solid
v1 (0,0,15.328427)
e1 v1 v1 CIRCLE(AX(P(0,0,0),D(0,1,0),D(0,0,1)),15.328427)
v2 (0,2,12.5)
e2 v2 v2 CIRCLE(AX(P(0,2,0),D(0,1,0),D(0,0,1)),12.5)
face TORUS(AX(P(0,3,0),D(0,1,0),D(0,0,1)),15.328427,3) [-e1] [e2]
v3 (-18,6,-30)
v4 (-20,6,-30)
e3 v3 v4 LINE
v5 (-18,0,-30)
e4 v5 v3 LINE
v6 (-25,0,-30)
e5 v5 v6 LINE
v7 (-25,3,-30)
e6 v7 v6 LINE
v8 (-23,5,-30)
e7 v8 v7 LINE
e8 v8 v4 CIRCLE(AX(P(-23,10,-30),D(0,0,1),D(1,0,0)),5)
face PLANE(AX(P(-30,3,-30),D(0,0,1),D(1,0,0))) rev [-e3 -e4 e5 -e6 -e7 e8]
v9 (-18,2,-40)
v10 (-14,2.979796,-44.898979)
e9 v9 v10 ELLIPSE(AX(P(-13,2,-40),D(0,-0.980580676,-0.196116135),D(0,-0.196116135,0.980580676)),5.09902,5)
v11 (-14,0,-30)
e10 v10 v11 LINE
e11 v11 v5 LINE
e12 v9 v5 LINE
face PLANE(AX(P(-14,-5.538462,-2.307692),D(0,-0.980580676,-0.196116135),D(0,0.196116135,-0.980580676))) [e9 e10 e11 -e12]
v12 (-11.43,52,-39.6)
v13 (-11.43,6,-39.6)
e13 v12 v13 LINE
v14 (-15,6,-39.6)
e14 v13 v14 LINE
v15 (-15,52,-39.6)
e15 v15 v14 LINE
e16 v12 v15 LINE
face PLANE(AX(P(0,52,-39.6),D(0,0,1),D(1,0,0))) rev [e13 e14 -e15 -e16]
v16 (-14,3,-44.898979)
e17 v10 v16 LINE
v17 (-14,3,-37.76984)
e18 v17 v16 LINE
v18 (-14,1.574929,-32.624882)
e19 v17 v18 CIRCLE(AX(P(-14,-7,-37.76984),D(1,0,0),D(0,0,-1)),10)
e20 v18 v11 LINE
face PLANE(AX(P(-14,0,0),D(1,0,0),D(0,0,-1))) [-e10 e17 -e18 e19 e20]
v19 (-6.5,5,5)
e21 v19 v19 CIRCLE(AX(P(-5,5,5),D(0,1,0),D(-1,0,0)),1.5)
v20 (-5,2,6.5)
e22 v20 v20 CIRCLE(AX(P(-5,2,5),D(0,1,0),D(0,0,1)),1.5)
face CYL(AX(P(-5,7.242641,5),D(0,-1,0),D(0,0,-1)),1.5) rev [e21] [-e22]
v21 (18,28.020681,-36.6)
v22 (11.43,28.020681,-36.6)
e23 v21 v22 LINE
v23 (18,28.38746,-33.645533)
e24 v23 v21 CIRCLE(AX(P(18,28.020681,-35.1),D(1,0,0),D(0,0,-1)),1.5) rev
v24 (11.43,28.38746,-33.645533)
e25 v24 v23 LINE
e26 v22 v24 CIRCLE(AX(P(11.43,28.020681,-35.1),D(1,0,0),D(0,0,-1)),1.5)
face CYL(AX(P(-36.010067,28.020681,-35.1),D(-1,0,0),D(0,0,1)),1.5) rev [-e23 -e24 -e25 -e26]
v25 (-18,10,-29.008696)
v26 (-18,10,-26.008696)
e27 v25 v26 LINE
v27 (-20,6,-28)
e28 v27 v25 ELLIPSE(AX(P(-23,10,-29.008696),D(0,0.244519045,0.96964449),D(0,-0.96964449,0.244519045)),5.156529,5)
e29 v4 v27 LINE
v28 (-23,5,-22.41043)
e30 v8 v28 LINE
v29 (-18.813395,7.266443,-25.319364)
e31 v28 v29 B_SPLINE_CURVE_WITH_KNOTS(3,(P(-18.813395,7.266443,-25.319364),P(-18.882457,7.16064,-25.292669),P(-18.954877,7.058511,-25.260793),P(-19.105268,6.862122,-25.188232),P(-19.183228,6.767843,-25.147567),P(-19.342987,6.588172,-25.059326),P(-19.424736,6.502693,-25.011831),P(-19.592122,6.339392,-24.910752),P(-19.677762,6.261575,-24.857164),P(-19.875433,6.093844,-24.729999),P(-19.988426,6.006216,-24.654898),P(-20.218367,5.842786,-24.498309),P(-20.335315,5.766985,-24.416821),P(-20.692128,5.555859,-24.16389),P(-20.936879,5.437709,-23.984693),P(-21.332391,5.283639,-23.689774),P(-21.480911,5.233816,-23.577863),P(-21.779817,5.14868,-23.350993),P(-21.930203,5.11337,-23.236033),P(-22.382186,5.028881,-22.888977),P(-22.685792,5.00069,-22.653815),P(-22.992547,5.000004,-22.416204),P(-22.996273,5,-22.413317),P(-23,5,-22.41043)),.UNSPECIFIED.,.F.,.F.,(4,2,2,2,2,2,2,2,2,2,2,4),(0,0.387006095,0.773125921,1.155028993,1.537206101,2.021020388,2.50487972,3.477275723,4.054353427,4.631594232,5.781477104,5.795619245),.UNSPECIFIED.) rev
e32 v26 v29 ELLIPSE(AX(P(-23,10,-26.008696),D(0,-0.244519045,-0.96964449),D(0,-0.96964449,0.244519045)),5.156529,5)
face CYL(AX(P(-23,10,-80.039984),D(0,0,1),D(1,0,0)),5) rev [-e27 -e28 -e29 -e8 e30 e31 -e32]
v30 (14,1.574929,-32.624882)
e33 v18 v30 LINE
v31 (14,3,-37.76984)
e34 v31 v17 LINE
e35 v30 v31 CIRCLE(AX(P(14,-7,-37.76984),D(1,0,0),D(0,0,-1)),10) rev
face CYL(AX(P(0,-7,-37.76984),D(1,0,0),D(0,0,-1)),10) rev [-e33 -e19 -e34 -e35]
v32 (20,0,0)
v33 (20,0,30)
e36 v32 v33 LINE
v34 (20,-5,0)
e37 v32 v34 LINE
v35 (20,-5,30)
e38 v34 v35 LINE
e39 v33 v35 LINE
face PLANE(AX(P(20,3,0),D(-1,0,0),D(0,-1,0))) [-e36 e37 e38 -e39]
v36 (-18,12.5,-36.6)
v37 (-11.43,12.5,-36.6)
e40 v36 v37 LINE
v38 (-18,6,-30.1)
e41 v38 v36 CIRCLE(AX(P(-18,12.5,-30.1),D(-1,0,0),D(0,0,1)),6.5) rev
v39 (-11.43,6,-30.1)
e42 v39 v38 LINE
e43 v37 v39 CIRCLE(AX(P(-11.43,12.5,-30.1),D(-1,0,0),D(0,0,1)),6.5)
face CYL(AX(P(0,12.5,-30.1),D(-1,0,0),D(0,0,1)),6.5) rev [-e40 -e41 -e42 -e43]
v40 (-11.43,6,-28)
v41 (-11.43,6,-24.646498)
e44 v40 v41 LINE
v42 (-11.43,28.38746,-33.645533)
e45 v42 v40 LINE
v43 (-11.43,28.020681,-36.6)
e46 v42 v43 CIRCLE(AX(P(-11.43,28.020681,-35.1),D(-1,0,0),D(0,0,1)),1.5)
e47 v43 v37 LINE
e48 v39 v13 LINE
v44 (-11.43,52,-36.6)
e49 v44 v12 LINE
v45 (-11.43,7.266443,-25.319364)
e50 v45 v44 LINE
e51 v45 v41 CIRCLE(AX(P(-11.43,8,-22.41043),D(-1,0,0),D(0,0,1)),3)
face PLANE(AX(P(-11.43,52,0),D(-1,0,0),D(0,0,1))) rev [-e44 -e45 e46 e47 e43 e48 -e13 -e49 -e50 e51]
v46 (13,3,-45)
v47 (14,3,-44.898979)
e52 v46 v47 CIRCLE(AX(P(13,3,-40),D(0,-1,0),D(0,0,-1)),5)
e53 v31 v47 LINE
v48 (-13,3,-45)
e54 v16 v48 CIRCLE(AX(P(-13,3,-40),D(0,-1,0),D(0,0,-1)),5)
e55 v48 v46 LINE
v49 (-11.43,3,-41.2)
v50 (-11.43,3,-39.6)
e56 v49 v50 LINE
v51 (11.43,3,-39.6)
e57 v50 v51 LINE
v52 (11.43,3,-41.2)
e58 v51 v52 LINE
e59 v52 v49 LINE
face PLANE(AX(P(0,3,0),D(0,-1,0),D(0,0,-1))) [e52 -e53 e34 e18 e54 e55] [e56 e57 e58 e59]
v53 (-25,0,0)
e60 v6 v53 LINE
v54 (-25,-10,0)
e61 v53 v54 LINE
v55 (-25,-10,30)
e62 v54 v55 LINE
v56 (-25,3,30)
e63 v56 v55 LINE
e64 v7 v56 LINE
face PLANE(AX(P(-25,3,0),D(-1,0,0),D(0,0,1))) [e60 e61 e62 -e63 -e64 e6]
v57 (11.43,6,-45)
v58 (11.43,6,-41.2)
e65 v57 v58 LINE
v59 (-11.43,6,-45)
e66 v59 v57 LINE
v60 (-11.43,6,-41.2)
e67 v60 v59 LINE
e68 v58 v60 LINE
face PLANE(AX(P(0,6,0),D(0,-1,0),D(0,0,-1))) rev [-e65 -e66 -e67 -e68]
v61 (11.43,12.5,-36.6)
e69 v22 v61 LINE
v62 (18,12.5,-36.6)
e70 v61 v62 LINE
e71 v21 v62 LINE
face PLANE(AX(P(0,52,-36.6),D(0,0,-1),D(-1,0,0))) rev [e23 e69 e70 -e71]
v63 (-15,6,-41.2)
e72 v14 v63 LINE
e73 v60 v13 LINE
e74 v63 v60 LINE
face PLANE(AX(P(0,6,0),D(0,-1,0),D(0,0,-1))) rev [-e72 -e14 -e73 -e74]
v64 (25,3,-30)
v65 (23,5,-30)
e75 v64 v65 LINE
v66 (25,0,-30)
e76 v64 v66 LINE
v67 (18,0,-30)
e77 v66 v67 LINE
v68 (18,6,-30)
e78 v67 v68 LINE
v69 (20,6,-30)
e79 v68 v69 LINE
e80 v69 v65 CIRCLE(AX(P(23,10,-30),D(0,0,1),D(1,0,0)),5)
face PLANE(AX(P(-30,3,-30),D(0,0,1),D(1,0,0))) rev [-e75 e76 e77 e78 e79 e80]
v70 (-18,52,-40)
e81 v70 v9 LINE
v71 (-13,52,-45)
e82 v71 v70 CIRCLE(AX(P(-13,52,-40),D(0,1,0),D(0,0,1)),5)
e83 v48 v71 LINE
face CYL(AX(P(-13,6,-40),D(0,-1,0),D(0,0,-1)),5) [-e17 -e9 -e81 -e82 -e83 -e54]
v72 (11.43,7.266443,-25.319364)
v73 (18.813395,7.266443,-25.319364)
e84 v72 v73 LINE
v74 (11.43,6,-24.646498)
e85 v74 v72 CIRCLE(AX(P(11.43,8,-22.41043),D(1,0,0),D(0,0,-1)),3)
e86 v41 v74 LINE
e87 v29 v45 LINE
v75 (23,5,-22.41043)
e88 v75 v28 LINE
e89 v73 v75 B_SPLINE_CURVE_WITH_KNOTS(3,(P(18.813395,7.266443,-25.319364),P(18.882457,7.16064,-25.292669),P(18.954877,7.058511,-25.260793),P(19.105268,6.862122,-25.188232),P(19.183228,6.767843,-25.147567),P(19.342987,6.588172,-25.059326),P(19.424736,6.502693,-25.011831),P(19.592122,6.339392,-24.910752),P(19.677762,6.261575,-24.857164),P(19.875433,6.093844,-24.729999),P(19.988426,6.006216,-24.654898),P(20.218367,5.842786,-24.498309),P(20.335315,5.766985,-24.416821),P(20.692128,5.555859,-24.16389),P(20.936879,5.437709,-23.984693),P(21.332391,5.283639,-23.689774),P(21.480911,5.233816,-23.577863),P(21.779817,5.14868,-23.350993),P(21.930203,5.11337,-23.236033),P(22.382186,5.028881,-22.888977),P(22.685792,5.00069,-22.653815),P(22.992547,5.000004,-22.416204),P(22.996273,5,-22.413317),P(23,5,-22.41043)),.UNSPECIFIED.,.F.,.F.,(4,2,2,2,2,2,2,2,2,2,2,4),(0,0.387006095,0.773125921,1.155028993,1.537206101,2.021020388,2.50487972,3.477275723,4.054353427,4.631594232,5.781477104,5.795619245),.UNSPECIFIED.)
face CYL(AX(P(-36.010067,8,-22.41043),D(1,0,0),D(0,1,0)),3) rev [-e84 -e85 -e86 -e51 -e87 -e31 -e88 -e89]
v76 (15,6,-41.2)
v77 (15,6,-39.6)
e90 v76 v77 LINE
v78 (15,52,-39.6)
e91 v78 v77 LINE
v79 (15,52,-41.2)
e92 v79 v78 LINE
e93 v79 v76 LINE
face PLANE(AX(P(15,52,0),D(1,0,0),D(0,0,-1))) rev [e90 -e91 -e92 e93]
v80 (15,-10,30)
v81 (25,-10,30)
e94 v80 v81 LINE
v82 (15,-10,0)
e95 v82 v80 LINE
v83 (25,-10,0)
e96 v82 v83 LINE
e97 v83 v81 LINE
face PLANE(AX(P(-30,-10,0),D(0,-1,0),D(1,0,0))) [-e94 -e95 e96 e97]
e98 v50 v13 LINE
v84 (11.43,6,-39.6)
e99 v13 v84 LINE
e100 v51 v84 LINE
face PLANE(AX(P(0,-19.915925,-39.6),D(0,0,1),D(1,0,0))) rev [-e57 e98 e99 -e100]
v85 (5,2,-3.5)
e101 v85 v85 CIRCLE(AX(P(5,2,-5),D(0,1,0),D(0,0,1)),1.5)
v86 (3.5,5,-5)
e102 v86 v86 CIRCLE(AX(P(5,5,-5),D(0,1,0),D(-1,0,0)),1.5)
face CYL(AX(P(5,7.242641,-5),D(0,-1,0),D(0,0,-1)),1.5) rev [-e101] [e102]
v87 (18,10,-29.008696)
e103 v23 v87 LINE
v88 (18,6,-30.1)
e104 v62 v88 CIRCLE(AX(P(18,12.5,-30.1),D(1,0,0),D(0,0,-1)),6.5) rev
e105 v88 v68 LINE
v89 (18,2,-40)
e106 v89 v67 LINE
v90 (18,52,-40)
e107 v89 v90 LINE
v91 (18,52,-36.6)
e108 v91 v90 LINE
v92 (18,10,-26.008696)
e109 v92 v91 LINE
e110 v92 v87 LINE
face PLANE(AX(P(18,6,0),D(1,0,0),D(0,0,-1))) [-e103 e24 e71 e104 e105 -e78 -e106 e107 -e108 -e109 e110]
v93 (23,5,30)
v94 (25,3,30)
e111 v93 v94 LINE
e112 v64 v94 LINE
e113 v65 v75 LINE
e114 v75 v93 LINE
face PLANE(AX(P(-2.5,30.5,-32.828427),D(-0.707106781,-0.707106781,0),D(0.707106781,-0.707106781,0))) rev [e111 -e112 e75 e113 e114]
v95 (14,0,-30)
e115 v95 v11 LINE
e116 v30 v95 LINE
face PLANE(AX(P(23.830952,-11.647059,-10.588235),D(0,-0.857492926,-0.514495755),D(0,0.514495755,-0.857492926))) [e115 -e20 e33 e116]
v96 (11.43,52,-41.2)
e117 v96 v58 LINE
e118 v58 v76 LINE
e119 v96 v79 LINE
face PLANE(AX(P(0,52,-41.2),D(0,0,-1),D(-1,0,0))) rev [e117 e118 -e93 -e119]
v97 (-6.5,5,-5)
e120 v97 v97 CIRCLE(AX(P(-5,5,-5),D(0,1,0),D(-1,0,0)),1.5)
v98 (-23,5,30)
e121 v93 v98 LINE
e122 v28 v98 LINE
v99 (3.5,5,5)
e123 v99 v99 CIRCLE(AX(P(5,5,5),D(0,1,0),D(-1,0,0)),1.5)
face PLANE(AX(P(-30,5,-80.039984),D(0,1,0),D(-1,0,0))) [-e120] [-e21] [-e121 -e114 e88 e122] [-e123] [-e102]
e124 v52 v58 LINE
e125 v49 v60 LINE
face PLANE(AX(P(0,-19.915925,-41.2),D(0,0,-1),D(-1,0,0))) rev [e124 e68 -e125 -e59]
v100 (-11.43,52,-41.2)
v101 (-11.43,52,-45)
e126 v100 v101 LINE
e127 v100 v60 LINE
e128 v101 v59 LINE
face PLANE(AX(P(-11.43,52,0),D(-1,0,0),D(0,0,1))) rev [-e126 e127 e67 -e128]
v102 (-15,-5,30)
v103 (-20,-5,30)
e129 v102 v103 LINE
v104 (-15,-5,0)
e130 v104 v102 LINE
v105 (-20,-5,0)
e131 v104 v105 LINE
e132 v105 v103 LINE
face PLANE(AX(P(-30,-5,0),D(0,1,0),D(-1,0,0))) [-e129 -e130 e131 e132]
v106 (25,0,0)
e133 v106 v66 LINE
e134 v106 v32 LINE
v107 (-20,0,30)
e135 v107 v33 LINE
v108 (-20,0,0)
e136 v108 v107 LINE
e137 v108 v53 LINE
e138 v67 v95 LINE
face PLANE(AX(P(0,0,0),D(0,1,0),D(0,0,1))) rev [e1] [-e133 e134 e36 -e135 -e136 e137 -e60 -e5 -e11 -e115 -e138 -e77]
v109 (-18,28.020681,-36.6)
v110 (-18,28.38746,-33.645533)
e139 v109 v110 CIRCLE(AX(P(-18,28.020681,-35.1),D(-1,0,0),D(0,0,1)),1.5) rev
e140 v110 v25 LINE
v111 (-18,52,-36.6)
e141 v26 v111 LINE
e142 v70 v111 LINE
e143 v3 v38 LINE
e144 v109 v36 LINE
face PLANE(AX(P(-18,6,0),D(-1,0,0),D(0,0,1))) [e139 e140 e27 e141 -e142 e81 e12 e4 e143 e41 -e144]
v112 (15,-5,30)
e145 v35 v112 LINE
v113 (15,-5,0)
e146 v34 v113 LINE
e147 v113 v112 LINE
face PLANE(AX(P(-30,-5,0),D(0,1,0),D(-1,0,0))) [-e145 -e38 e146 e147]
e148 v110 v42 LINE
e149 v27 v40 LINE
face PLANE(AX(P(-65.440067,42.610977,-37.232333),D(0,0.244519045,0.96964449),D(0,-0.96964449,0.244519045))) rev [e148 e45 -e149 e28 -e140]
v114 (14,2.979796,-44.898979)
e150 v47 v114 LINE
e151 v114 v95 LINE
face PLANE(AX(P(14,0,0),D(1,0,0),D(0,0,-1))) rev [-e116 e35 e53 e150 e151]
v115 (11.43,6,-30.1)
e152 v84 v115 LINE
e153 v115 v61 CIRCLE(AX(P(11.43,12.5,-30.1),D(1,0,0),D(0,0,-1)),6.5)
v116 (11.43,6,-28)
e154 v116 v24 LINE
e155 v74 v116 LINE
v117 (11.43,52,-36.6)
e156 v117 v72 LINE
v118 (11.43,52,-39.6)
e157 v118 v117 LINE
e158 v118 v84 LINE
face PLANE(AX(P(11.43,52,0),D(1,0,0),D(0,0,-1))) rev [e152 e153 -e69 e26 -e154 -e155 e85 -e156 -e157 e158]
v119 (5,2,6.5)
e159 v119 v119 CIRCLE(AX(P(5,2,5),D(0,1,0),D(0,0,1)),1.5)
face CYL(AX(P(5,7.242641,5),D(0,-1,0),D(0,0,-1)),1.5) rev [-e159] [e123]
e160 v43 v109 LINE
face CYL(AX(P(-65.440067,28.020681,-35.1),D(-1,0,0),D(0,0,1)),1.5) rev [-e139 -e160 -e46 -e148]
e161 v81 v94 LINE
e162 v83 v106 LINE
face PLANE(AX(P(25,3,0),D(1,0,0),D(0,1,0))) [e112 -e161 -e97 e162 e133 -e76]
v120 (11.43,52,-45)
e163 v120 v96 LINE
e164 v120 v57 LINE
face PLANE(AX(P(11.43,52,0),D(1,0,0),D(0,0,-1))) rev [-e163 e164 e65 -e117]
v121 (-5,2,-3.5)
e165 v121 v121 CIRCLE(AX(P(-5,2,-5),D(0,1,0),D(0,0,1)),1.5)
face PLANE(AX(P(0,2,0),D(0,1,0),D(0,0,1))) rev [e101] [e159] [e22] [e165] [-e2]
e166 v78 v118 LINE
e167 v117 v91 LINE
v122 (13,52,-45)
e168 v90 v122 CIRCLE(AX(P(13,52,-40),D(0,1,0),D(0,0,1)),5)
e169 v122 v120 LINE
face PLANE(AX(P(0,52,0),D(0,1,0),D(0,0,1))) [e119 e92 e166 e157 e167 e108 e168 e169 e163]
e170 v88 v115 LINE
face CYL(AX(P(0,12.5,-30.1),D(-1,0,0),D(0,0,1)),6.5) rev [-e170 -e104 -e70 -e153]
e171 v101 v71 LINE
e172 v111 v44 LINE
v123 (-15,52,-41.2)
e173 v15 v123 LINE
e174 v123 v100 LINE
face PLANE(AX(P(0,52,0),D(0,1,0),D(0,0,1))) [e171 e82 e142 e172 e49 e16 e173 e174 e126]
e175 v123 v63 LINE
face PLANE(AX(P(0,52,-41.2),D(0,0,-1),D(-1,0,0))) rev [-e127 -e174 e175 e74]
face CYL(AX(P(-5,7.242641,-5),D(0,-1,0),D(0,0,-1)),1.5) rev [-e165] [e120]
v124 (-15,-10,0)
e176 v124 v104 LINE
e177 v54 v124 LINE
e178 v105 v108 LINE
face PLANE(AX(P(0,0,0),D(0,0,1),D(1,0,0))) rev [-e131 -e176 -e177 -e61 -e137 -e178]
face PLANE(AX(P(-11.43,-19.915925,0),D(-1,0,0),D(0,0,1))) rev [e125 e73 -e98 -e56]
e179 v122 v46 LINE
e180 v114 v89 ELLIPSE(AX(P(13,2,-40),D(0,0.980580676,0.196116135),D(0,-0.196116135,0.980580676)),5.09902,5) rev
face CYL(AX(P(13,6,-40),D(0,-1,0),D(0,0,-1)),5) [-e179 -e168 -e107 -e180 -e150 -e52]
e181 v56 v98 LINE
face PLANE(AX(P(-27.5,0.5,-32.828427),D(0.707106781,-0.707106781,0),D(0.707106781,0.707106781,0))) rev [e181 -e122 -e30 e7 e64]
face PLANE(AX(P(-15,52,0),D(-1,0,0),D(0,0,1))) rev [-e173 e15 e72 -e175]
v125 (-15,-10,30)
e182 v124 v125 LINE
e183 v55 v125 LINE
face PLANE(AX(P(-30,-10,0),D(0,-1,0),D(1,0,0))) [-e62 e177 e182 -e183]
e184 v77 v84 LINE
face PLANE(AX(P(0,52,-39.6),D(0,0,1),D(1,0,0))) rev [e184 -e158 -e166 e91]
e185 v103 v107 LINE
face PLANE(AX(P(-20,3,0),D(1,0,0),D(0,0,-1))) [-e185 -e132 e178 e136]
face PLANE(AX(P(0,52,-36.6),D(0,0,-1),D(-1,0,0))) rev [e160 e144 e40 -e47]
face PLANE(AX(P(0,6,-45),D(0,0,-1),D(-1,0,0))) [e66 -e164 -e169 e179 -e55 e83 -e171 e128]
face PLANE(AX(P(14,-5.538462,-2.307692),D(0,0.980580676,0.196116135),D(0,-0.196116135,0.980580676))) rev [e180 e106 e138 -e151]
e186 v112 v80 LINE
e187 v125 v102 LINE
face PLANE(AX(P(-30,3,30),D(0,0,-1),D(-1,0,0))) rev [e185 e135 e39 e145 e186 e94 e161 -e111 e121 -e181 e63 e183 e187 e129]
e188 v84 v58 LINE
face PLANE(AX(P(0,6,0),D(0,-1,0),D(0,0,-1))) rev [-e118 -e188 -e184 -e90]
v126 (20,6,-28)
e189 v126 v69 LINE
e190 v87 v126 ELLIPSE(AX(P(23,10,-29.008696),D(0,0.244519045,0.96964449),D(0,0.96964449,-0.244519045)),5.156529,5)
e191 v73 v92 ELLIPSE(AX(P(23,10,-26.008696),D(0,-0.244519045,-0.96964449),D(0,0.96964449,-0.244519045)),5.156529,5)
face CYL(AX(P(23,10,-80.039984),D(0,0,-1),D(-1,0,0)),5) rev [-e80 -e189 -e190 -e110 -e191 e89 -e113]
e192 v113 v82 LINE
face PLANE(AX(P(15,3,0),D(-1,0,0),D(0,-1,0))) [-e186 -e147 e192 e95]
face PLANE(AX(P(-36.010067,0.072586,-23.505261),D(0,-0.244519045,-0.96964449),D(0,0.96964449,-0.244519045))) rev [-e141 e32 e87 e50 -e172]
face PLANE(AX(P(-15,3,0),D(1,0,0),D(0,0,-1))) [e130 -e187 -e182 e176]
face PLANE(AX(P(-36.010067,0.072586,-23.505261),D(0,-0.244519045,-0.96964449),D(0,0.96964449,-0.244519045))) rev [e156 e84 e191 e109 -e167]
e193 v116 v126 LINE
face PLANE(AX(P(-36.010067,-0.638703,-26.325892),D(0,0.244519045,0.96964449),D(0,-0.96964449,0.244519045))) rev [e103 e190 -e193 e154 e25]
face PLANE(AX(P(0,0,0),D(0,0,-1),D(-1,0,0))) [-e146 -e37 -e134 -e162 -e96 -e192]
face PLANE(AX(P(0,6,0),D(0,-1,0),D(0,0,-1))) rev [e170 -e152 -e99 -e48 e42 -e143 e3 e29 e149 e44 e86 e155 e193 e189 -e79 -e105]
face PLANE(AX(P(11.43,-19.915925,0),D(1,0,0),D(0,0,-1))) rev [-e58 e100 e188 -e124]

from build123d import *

# Parameters (mm, degrees)
SKETCH_2_W          = 60
SKETCH_2_H          = 60
EXTRUDE_1_DEPTH     = 3
SKETCH_3_R          = 1.5
CUT_EXTRUDE_1_DEPTH = 3
EXTRUDE_START       = 30
EXTRUDE_3_DEPTH     = 30
EXTRUDE_START_2     = 3
SKETCH_8_W          = 36
SKETCH_8_H          = 20
EXTRUDE_4_DEPTH     = 3
CUT_EXTRUDE_START   = 6
SKETCH_10_W         = 22.86
SKETCH_10_H         = 1.6
CUT_EXTRUDE_2_DEPTH = 3
EXTRUDE_START_3     = 6
EXTRUDE_5_DEPTH     = 46
EXTRUDE_START_4     = -18
EXTRUDE_6_DEPTH     = 36
EXTRUDE_START_5     = 18
EXTRUDE_8_DEPTH     = 6.57
EXTRUDE_START_6     = -11.43
EXTRUDE_9_DEPTH     = 6.57
EXTRUDE_10_DEPTH    = 36
SKETCH_16_W         = 5
SKETCH_16_H         = 60
CUT_EXTRUDE_3_DEPTH = 3
EXTRUDE_11_DEPTH    = 4
EXTRUDE_12_DEPTH    = 4
FILLET_3_R          = 5
FILLET_4_R          = 10
SKETCH_22_W         = 50
SKETCH_22_H         = 2
EXTRUDE_14_DEPTH    = 60
CUT_EXTRUDE_START_2 = 30
CUT_EXTRUDE_4_DEPTH = 60
SKETCH_25_R         = 1.5
CUT_EXTRUDE_5_DEPTH = 5
SKETCH_26_R         = 12.5
CUT_EXTRUDE_6_DEPTH = 2
FILLET_5_R          = 3
FILLET_7_R          = 5
FILLET_8_R          = 6.5
FILLET_9_R          = 1.5
FILLET_10_R         = 3


with BuildPart() as part:
    # 草图2 → 凸台-拉伸1 (new body)
    with BuildSketch(Plane(origin=(0, 0, 0), x_dir=(1, 0, 0), z_dir=(0, 1, 0))):
        Rectangle(SKETCH_2_W, SKETCH_2_H)
    extrude(amount=EXTRUDE_1_DEPTH)

    # 草图3 → 切除-拉伸1 (cut)
    with BuildSketch(Plane(origin=(0, 0, 0), x_dir=(1, 0, 0), z_dir=(0, 1, 0))):
        with Locations(Location((-5, -5, 0), (0, 0, 270))):
            Circle(SKETCH_3_R)
        with Locations(Location((5, -5, 0), (0, 0, 270))):
            Circle(SKETCH_3_R)
        with Locations(Location((5, 5, 0), (0, 0, 270))):
            Circle(SKETCH_3_R)
        with Locations(Location((-5, 5, 0), (0, 0, 270))):
            Circle(SKETCH_3_R)
    extrude(amount=CUT_EXTRUDE_1_DEPTH, mode=Mode.SUBTRACT)

    # 草图7 → 凸台-拉伸3 (add)
    with BuildSketch(Plane.XY.offset(EXTRUDE_START)):
        Polygon((-25, 0), (-25, -10), (-15, -10), (-15, -5), (-20, -5), (-20, 0), align=None)
        Polygon((20, 0), (25, 0), (25, -10), (15, -10), (15, -5), (20, -5), align=None)
    extrude(amount=-EXTRUDE_3_DEPTH)

    # 草图8 → 凸台-拉伸4 (add)
    with BuildSketch(Plane(origin=(0, 0, 0), x_dir=(1, 0, 0), z_dir=(0, 1, 0)).offset(EXTRUDE_START_2)):
        with Locations((0, 35)):
            Rectangle(SKETCH_8_W, SKETCH_8_H)
    extrude(amount=EXTRUDE_4_DEPTH)

    # 草图10 → 切除-拉伸2 (cut)
    with BuildSketch(Plane(origin=(0, 0, 0), x_dir=(1, 0, 0), z_dir=(0, 1, 0)).offset(CUT_EXTRUDE_START)):
        with Locations((0, 40.4)):
            Rectangle(SKETCH_10_W, SKETCH_10_H)
    extrude(amount=-CUT_EXTRUDE_2_DEPTH, mode=Mode.SUBTRACT)

    # 草图11 → 凸台-拉伸5 (add)
    with BuildSketch(Plane(origin=(0, 0, 0), x_dir=(1, 0, 0), z_dir=(0, 1, 0)).offset(EXTRUDE_START_3)):
        Polygon((11.43, 41.2), (11.43, 45), (18, 45), (18, 36.6), (11.43, 36.6), (11.43, 39.6), (15, 39.6), (15, 41.2), align=None)
        Polygon((-15, 41.2), (-15, 39.6), (-11.43, 39.6), (-11.43, 36.6), (-18, 36.6), (-18, 45), (-11.43, 45), (-11.43, 41.2), align=None)
    extrude(amount=EXTRUDE_5_DEPTH)

    # 草图12 → 凸台-拉伸6 (add)
    with BuildSketch(Plane(origin=(0, 0, 0), x_dir=(0, 0, -1), z_dir=(1, 0, 0)).offset(EXTRUDE_START_4)):
        Polygon((30, 0), (35, 3), (30, 3), align=None)
    extrude(amount=EXTRUDE_6_DEPTH)

    # 草图13 → 凸台-拉伸8 (add)
    with BuildSketch(Plane(origin=(0, 0, 0), x_dir=(0, 0, -1), z_dir=(1, 0, 0)).offset(EXTRUDE_START_5)):
        Polygon((25, 6), (36.6, 52), (36.6, 40.103448276), (28, 6), align=None)
    extrude(amount=-EXTRUDE_8_DEPTH)

    # 草图14 → 凸台-拉伸9 (add)
    with BuildSketch(Plane(origin=(0, 0, 0), x_dir=(0, 0, -1), z_dir=(1, 0, 0)).offset(EXTRUDE_START_6)):
        Polygon((36.6, 52), (25, 6), (28, 6), (36.6, 40.103448276), align=None)
    extrude(amount=-EXTRUDE_9_DEPTH)

    # 草图15 → 凸台-拉伸10 (add)
    with BuildSketch(Plane(origin=(0, 0, 0), x_dir=(0, 0, -1), z_dir=(1, 0, 0)).offset(EXTRUDE_START_4)):
        Polygon((25, 3), (24.243478261, 3), (25, 6), align=None)
    extrude(amount=EXTRUDE_10_DEPTH)

    # 草图16 → 切除-拉伸3 (cut)
    with BuildSketch(Plane(origin=(0, 0, 0), x_dir=(1, 0, 0), z_dir=(0, 1, 0))):
        with Locations((27.5, 0)):
            Rectangle(SKETCH_16_W, SKETCH_16_H)
        with Locations((-27.5, 0)):
            Rectangle(SKETCH_16_W, SKETCH_16_H)
    extrude(amount=CUT_EXTRUDE_3_DEPTH, mode=Mode.SUBTRACT)

    # 草图17 → 凸台-拉伸11 (add)
    with BuildSketch(Plane(origin=(0, 0, 0), x_dir=(0, 0, -1), z_dir=(1, 0, 0)).offset(EXTRUDE_START_5)):
        Polygon((30, 0), (45, 3), (30, 3), align=None)
    extrude(amount=-EXTRUDE_11_DEPTH)

    # 草图18 → 凸台-拉伸12 (add)
    with BuildSketch(Plane(origin=(0, 0, 0), x_dir=(0, 0, -1), z_dir=(1, 0, 0)).offset(EXTRUDE_START_4)):
        Polygon((30, 0), (30, 3), (45, 3), align=None)
    extrude(amount=EXTRUDE_12_DEPTH)

    # 圆角3
    # the kernel refuses this fillet: 5 mm, written as the material it takes off along each edge
    with BuildSketch(Plane(origin=(18, -9.5, -45), x_dir=(0, 0, 1), z_dir=(0, 1, 0)), Plane(origin=(-18, 64.5, -45), x_dir=(0, 0, 1), z_dir=(0, -1, 0))) as fillet_3_piece_1:
        with BuildLine():
            CenterArc((FILLET_3_R, -FILLET_3_R), FILLET_3_R, 90, 90)
            Line((0, -FILLET_3_R), (0, 0))
            Line((0, 0), (FILLET_3_R, 0))
        make_face()
    extrude(amount=74, mode=Mode.SUBTRACT)

    # 圆角4
    fillet_4_edges = [part.edges().sort_by_distance(p)[0] for p in [
        (0, 3, -35),
    ]]
    fillet(fillet_4_edges, radius=FILLET_4_R)

    # 草图22 → 凸台-拉伸14 (add)
    with BuildSketch(Plane.XY.offset(EXTRUDE_START)):
        with Locations((0, 4)):
            Rectangle(SKETCH_22_W, SKETCH_22_H)
    extrude(amount=-EXTRUDE_14_DEPTH)

    # 草图24 → 切除-拉伸4 (cut)
    with BuildSketch(Plane.XY.offset(CUT_EXTRUDE_START_2)):
        Polygon((-25, 5), (-23, 5), (-25, 3), align=None)
        Polygon((25, 5), (25, 3), (23, 5), align=None)
    extrude(amount=-CUT_EXTRUDE_4_DEPTH, mode=Mode.SUBTRACT)

    # 草图25 → 切除-拉伸5 (cut)
    with BuildSketch(Plane(origin=(0, 0, 0), x_dir=(1, 0, 0), z_dir=(0, 1, 0))):
        with Locations(Location((-5, 5, 0), (0, 0, 180))):
            Circle(SKETCH_25_R)
        with Locations(Location((5, 5, 0), (0, 0, 180))):
            Circle(SKETCH_25_R)
        with Locations(Location((5, -5, 0), (0, 0, 180))):
            Circle(SKETCH_25_R)
        with Locations(Location((-5, -5, 0), (0, 0, 180))):
            Circle(SKETCH_25_R)
    extrude(amount=CUT_EXTRUDE_5_DEPTH, mode=Mode.SUBTRACT)

    # 草图26 → 切除-拉伸6 (cut)
    with BuildSketch(Plane(origin=(0, 0, 0), x_dir=(1, 0, 0), z_dir=(0, 1, 0))):
        with Locations(Location((0, 0, 0), (0, 0, 270))):
            Circle(SKETCH_26_R)
    extrude(amount=CUT_EXTRUDE_6_DEPTH, mode=Mode.SUBTRACT)

    # 圆角5
    # the kernel refuses this fillet: 3 mm, written as the material it takes off along each edge
    with BuildSketch(Plane(origin=(0, 0, 0), x_dir=(0, 0, 1), z_dir=(-1, 0, 0))) as fillet_5_piece_1:
        with BuildLine():
            CenterArc((15.328427125, 3), FILLET_5_R, 199.471220634, 70.528779366)
            Line((15.328427125, 0), (15.328427125, -0.06))
            Line((15.328427125, -0.06), (12.5, -0.06))
            Line((12.5, -0.06), (12.44, 0))
            ThreePointArc((12.44, 0), (12.44, 1), (12.443431458, 1.98))
            Line((12.443431458, 1.98), (12.5, 2))
        make_face()
    revolve(axis=Axis((0, 0, 0), (0, 1, 0)), mode=Mode.SUBTRACT)

    # 圆角7
    # the kernel refuses this fillet: 5 mm, written as the material it adds along each edge
    with BuildSketch(Plane(origin=(-18, 5, -12.247826087), x_dir=(0, 1, 0), z_dir=(0, 0, -1))) as fillet_7_piece_1_section:
        with BuildLine():
            CenterArc((FILLET_7_R, -FILLET_7_R), FILLET_7_R, 90, 90)
            Line((0, -FILLET_7_R), (0, 0))
            Line((0, 0), (FILLET_7_R, 0))
        make_face()
    fillet_7_piece_1 = extrude(amount=30.252173913, mode=Mode.PRIVATE)
    fillet_7_piece_1 = split(fillet_7_piece_1, bisect_by=Plane(origin=(-18.571810287, 7.311264389, -25.330666672), z_dir=(0, -0.24451904524274018, -0.9696444897556934)), keep=Keep.TOP, mode=Mode.PRIVATE)
    fillet_7_piece_1 = split(fillet_7_piece_1, bisect_by=Plane(origin=(-18.571810287, 6.599974755, -28.151297982), z_dir=(0, 0.24451904524274015, 0.9696444897556934)), keep=Keep.TOP, mode=Mode.PRIVATE)
    add(fillet_7_piece_1)
    with BuildSketch(Plane(origin=(-18, 5, -12.247826087), x_dir=(0, 1, 0), z_dir=(0, 0, -1))) as fillet_7_piece_2_section:
        with BuildLine():
            CenterArc((FILLET_7_R, -FILLET_7_R), FILLET_7_R, 90, 90)
            Line((0, -FILLET_7_R), (0, 0))
            Line((0, 0), (FILLET_7_R, 0))
        make_face()
    fillet_7_piece_2 = extrude(amount=17.752173913, mode=Mode.PRIVATE)
    fillet_7_piece_2 = split(fillet_7_piece_2, bisect_by=Plane(origin=(-19.572975188, 6, -28.927333211), z_dir=(0, -1, 0)), keep=Keep.TOP, mode=Mode.PRIVATE)
    fillet_7_piece_2 = split(fillet_7_piece_2, bisect_by=Plane(origin=(-19.572975188, 5.678002788, -27.918800703), z_dir=(0, -0.24451904524274015, -0.9696444897556934)), keep=Keep.TOP, mode=Mode.PRIVATE)
    add(fillet_7_piece_2)
    with BuildSketch(Plane(origin=(18, 5, -30), x_dir=(1, 0, 0), z_dir=(0, 0, 1))) as fillet_7_piece_3_section:
        with BuildLine():
            CenterArc((FILLET_7_R, FILLET_7_R), FILLET_7_R, 180, 90)
            Line((0, FILLET_7_R), (0, 0))
            Line((0, 0), (FILLET_7_R, 0))
        make_face()
    fillet_7_piece_3 = extrude(amount=17.752173913, mode=Mode.PRIVATE)
    fillet_7_piece_3 = split(fillet_7_piece_3, bisect_by=Plane(origin=(19.572975189, 6, -28.92733321), z_dir=(0, -1, 0)), keep=Keep.TOP, mode=Mode.PRIVATE)
    fillet_7_piece_3 = split(fillet_7_piece_3, bisect_by=Plane(origin=(19.572975189, 6.389292423, -25.098169394), z_dir=(0, -0.24451904524274018, -0.9696444897556934)), keep=Keep.TOP, mode=Mode.PRIVATE)
    add(fillet_7_piece_3)
    with BuildSketch(Plane(origin=(18, 5, -42.5), x_dir=(1, 0, 0), z_dir=(0, 0, 1))) as fillet_7_piece_4_section:
        with BuildLine():
            CenterArc((FILLET_7_R, FILLET_7_R), FILLET_7_R, 180, 90)
            Line((0, FILLET_7_R), (0, 0))
            Line((0, 0), (FILLET_7_R, 0))
        make_face()
    fillet_7_piece_4 = extrude(amount=30.252173913, mode=Mode.PRIVATE)
    fillet_7_piece_4 = split(fillet_7_piece_4, bisect_by=Plane(origin=(18.571810287, 7.311264389, -25.330666672), z_dir=(0, -0.24451904524274018, -0.9696444897556934)), keep=Keep.TOP, mode=Mode.PRIVATE)
    fillet_7_piece_4 = split(fillet_7_piece_4, bisect_by=Plane(origin=(18.571810287, 6.599974754, -28.151297982), z_dir=(0, 0.24451904524274015, 0.9696444897556934)), keep=Keep.TOP, mode=Mode.PRIVATE)
    add(fillet_7_piece_4)

    # 圆角8
    fillet_8_edges = [part.edges().sort_by_distance(p)[0] for p in [
        (-14.715, 6, -36.6),
        (14.715, 6, -36.6),
    ]]
    fillet(fillet_8_edges, radius=FILLET_8_R)

    # 圆角9
    fillet_9_edges = [part.edges().sort_by_distance(p)[0] for p in [
        (14.715, 40.103448276, -36.6),
        (-14.715, 40.103448276, -36.6),
    ]]
    fillet(fillet_9_edges, radius=FILLET_9_R)

    # 圆角10
    # the kernel refuses this fillet: 3 mm, written as the material it adds along each edge
    with BuildSketch(Plane(origin=(-28.843489259, 5, -24.747826087), x_dir=(-2.8138525512499648e-15, 0.9696444897556498, -0.24451904524291254), z_dir=(1, 0, 0))) as fillet_10_piece_1_section:
        with BuildLine():
            CenterArc((FILLET_10_R * 0.779131901165, FILLET_10_R), FILLET_10_R, 194.153412588, 75.846587412)
            Line((-FILLET_10_R * 0.190512588591, FILLET_10_R * 0.755480954757), (0, 0))
            Line((0, 0), (FILLET_10_R * 0.779131901165, 0))
        make_face()
    fillet_10_piece_1 = extrude(amount=57.686978517, mode=Mode.PRIVATE)
    fillet_10_piece_1 = split(fillet_10_piece_1, bisect_by=Plane(origin=(-16.50607505, 6, -24.188979992), z_dir=(0, -1, 0)), keep=Keep.TOP, mode=Mode.PRIVATE)
    fillet_10_piece_1 = fillet_10_piece_1 - Plane(origin=(-23, 10, -24.188979992), x_dir=(0, 1, 0), z_dir=(0, 0, 1)) * Cylinder(5, 125, mode=Mode.PRIVATE)
    fillet_10_piece_1 = split(fillet_10_piece_1, bisect_by=Plane(origin=(-11.43, 5.296453609, -24.188979992), z_dir=(-1, 0, 0)), keep=Keep.TOP, mode=Mode.PRIVATE)
    fillet_10_piece_1 = split(fillet_10_piece_1, bisect_by=Plane(origin=(-19.60481072, 8.39518928, -24.188979992), z_dir=(0.7071067811865488, -0.7071067811865462, 0)), keep=Keep.TOP, mode=Mode.PRIVATE)
    add(fillet_10_piece_1)
    with BuildSketch(Plane(origin=(-28.843489259, 5, -24.747826087), x_dir=(-2.8138525512499648e-15, 0.9696444897556498, -0.24451904524291254), z_dir=(1, 0, 0))) as fillet_10_piece_2_section:
        with BuildLine():
            CenterArc((FILLET_10_R * 0.779131901165, FILLET_10_R), FILLET_10_R, 194.153412588, 75.846587412)
            Line((-FILLET_10_R * 0.190512588591, FILLET_10_R * 0.755480954757), (0, 0))
            Line((0, 0), (FILLET_10_R * 0.779131901165, 0))
        make_face()
    fillet_10_piece_2 = extrude(amount=57.686978517, mode=Mode.PRIVATE)
    fillet_10_piece_2 = split(fillet_10_piece_2, bisect_by=Plane(origin=(-15.490459674, 6, -25.045388179), z_dir=(0, 1, 0)), keep=Keep.TOP, mode=Mode.PRIVATE)
    fillet_10_piece_2 = fillet_10_piece_2 - Plane(origin=(-23, 10, -25.045388179), x_dir=(0, 1, 0), z_dir=(0, 0, 1)) * Cylinder(5, 125, mode=Mode.PRIVATE)
    fillet_10_piece_2 = split(fillet_10_piece_2, bisect_by=Plane(origin=(-11.43, 6.408777733, -25.045388179), z_dir=(-1, 0, 0)), keep=Keep.TOP, mode=Mode.PRIVATE)
    fillet_10_piece_2 = split(fillet_10_piece_2, bisect_by=Plane(origin=(-18.54084097, 9.45915903, -25.045388179), z_dir=(0.7071067811865488, -0.7071067811865462, 0)), keep=Keep.TOP, mode=Mode.PRIVATE)
    add(fillet_10_piece_2)
    with BuildSketch(Plane(origin=(-28.843489259, 5, -24.747826087), x_dir=(-2.8138525512499648e-15, 0.9696444897556498, -0.24451904524291254), z_dir=(1, 0, 0))) as fillet_10_piece_3_section:
        with BuildLine():
            CenterArc((FILLET_10_R * 0.779131901165, FILLET_10_R), FILLET_10_R, 194.153412588, 75.846587412)
            Line((-FILLET_10_R * 0.190512588591, FILLET_10_R * 0.755480954757), (0, 0))
            Line((0, 0), (FILLET_10_R * 0.779131901165, 0))
        make_face()
    fillet_10_piece_3 = extrude(amount=57.686978517, mode=Mode.PRIVATE)
    fillet_10_piece_3 = split(fillet_10_piece_3, bisect_by=Plane(origin=(0, 6, -24.222418931), z_dir=(0, -1, 0)), keep=Keep.TOP, mode=Mode.PRIVATE)
    fillet_10_piece_3 = split(fillet_10_piece_3, bisect_by=Plane(origin=(-11.43, 5.321349944, -24.222418931), z_dir=(1, 0, 0)), keep=Keep.TOP, mode=Mode.PRIVATE)
    fillet_10_piece_3 = split(fillet_10_piece_3, bisect_by=Plane(origin=(11.43, 5.321349944, -24.222418931), z_dir=(-1, 0, 0)), keep=Keep.TOP, mode=Mode.PRIVATE)
    add(fillet_10_piece_3)
    with BuildSketch(Plane(origin=(-28.843489259, 5, -24.747826087), x_dir=(-2.8138525512499648e-15, 0.9696444897556498, -0.24451904524291254), z_dir=(1, 0, 0))) as fillet_10_piece_4_section:
        with BuildLine():
            CenterArc((FILLET_10_R * 0.779131901165, FILLET_10_R), FILLET_10_R, 194.153412588, 75.846587412)
            Line((-FILLET_10_R * 0.190512588591, FILLET_10_R * 0.755480954757), (0, 0))
            Line((0, 0), (FILLET_10_R * 0.779131901165, 0))
        make_face()
    fillet_10_piece_4 = extrude(amount=57.686978517, mode=Mode.PRIVATE)
    fillet_10_piece_4 = split(fillet_10_piece_4, bisect_by=Plane(origin=(16.50607505, 6, -24.188979992), z_dir=(0, -1, 0)), keep=Keep.TOP, mode=Mode.PRIVATE)
    fillet_10_piece_4 = fillet_10_piece_4 - Plane(origin=(23, 10, -24.188979992), x_dir=(1, 0, 0), z_dir=(0, 0, -1)) * Cylinder(5, 125, mode=Mode.PRIVATE)
    fillet_10_piece_4 = split(fillet_10_piece_4, bisect_by=Plane(origin=(11.43, 5.296453609, -24.188979992), z_dir=(1, 0, 0)), keep=Keep.TOP, mode=Mode.PRIVATE)
    fillet_10_piece_4 = split(fillet_10_piece_4, bisect_by=Plane(origin=(19.60481072, 8.39518928, -24.188979992), z_dir=(-0.7071067811865306, -0.7071067811865644, 0)), keep=Keep.TOP, mode=Mode.PRIVATE)
    add(fillet_10_piece_4)
    with BuildSketch(Plane(origin=(-28.843489259, 5, -24.747826087), x_dir=(-2.8138525512499648e-15, 0.9696444897556498, -0.24451904524291254), z_dir=(1, 0, 0))) as fillet_10_piece_5_section:
        with BuildLine():
            CenterArc((FILLET_10_R * 0.779131901165, FILLET_10_R), FILLET_10_R, 194.153412588, 75.846587412)
            Line((-FILLET_10_R * 0.190512588591, FILLET_10_R * 0.755480954757), (0, 0))
            Line((0, 0), (FILLET_10_R * 0.779131901165, 0))
        make_face()
    fillet_10_piece_5 = extrude(amount=57.686978517, mode=Mode.PRIVATE)
    fillet_10_piece_5 = split(fillet_10_piece_5, bisect_by=Plane(origin=(15.490459674, 6, -25.045388179), z_dir=(0, 1, 0)), keep=Keep.TOP, mode=Mode.PRIVATE)
    fillet_10_piece_5 = fillet_10_piece_5 - Plane(origin=(23, 10, -25.045388179), x_dir=(1, 0, 0), z_dir=(0, 0, -1)) * Cylinder(5, 125, mode=Mode.PRIVATE)
    fillet_10_piece_5 = split(fillet_10_piece_5, bisect_by=Plane(origin=(11.43, 6.408777733, -25.045388179), z_dir=(1, 0, 0)), keep=Keep.TOP, mode=Mode.PRIVATE)
    fillet_10_piece_5 = split(fillet_10_piece_5, bisect_by=Plane(origin=(18.54084097, 9.45915903, -25.045388179), z_dir=(-0.7071067811865306, -0.7071067811865644, 0)), keep=Keep.TOP, mode=Mode.PRIVATE)
    add(fillet_10_piece_5)


solid = part.part
